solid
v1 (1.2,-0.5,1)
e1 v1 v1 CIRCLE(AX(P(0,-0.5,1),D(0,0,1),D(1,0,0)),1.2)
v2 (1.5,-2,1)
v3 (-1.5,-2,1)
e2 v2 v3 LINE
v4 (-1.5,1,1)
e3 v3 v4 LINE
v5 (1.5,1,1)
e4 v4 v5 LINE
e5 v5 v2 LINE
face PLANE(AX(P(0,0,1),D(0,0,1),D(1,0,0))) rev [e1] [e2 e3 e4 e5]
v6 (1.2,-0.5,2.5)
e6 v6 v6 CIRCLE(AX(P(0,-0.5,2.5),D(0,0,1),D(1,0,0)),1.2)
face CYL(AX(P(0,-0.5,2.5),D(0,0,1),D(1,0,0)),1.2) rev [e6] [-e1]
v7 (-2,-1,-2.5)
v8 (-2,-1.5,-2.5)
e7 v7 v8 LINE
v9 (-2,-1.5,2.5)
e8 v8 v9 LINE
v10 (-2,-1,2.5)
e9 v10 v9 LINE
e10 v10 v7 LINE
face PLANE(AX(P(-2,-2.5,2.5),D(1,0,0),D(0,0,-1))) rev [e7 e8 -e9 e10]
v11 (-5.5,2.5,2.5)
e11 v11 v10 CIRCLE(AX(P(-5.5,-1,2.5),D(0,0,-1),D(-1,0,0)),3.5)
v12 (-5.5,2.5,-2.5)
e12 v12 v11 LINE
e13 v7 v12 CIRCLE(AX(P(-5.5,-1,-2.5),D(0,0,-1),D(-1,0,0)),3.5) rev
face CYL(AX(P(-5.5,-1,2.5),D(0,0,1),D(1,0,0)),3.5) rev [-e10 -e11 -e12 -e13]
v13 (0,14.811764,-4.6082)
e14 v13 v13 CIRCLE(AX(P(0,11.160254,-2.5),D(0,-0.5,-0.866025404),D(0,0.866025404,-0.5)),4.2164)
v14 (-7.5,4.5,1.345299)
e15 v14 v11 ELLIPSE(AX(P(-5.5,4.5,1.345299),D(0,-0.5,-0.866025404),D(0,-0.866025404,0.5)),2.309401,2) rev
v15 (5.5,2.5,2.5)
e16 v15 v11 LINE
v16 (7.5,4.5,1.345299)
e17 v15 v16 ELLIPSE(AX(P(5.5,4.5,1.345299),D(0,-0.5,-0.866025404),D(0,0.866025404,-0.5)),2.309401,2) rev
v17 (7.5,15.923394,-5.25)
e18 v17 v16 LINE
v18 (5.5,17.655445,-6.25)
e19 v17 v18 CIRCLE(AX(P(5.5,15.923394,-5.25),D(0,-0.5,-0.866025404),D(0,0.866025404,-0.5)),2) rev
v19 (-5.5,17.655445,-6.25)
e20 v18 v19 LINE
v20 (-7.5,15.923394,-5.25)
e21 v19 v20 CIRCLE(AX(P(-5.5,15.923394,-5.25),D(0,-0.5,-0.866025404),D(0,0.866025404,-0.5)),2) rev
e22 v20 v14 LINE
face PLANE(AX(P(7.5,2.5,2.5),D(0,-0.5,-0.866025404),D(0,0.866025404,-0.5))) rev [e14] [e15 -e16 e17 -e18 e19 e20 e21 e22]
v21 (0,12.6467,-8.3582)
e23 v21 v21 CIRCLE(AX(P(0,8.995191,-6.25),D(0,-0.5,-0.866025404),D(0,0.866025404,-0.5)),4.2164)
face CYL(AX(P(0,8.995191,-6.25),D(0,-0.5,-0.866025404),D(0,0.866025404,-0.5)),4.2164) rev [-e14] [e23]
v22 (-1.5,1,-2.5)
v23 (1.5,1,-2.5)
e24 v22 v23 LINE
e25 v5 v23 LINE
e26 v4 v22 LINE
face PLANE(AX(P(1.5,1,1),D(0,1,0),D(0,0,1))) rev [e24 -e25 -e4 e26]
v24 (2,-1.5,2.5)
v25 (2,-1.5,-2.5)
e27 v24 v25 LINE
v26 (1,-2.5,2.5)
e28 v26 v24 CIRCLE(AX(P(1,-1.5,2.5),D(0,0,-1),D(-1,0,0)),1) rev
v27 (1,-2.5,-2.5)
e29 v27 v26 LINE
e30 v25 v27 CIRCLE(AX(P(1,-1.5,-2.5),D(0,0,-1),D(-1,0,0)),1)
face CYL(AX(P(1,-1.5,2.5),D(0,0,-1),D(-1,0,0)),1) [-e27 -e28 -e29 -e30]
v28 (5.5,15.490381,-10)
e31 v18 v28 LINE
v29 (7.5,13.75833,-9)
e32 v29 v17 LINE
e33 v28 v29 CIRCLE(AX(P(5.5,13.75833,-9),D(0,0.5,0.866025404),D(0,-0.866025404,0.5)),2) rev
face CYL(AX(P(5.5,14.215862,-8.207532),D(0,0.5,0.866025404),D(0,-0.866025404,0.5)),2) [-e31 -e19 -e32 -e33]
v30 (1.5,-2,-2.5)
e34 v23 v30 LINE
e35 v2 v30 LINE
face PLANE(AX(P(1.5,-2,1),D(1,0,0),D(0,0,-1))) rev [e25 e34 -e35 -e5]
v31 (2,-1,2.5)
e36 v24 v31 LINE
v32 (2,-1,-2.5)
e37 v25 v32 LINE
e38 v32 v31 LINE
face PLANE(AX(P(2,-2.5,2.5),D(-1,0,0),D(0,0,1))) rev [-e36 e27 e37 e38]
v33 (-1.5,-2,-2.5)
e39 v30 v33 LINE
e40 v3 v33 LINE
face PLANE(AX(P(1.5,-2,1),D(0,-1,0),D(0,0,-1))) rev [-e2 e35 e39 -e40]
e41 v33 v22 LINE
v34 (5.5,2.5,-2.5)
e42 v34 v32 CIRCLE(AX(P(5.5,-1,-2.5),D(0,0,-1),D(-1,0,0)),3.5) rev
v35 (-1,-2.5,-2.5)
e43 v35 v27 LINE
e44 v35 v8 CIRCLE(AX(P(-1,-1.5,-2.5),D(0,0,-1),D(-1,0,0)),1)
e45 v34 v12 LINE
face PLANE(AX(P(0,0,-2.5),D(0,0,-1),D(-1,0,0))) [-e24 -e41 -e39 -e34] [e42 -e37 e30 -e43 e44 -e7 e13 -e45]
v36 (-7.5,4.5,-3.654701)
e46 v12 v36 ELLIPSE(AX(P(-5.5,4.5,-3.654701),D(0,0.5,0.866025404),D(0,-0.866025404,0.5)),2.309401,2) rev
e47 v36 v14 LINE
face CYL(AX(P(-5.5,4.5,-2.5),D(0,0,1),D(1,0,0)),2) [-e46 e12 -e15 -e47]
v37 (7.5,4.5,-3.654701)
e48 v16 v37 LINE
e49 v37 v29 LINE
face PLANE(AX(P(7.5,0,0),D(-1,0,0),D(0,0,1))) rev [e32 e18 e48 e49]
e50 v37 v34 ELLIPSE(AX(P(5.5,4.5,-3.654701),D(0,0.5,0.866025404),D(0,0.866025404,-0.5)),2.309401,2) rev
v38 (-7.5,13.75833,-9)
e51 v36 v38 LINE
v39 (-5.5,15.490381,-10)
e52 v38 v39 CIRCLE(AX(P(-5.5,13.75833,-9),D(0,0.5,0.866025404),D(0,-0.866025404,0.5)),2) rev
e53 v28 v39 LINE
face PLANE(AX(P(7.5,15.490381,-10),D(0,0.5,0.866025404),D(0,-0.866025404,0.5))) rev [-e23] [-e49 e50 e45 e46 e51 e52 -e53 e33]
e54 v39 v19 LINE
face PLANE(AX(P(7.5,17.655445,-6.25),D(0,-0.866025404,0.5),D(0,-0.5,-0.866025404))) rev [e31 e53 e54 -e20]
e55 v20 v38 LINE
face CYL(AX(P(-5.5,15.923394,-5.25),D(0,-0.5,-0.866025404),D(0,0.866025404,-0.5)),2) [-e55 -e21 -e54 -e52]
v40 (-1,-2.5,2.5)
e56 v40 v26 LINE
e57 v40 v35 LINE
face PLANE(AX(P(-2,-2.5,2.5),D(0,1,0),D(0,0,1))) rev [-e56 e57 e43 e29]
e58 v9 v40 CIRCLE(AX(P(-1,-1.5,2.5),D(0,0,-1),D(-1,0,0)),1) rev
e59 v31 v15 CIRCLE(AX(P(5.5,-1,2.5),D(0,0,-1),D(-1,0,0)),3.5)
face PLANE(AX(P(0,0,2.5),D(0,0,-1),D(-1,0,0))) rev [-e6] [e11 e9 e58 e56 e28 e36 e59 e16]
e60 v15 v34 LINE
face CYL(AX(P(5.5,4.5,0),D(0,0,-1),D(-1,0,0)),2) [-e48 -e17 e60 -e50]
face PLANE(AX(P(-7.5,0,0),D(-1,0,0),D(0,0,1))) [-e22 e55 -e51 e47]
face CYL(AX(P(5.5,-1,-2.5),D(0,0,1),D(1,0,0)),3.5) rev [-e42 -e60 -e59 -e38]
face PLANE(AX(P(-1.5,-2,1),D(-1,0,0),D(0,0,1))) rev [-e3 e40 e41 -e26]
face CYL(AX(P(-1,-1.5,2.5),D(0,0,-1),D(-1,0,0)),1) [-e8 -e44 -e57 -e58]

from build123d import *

# Parameters (mm, degrees)
SKETCH1_W                = 4
SKETCH1_H                = 5
BOSS_EXTRUDE1_DEPTH      = 2.5
SKETCH2_W                = 3
SKETCH2_H                = 3
CUT_EXTRUDE1_DEPTH       = 3.5
BOSS_EXTRUDE2_DEPTH      = 7.5
F_5_16_CLEARANCE_HOLE1_D = 8.4328
M2_CLEARANCE_HOLE1_D     = 2.4
FILLET1_R                = 3.5
FILLET2_R                = 2
FILLET3_R                = 1


with BuildPart() as part:
    # Sketch1 → Boss-Extrude1 (new, symmetric)
    with BuildSketch(Plane.XY):
        Rectangle(SKETCH1_W, SKETCH1_H)
    extrude(amount=BOSS_EXTRUDE1_DEPTH, both=True)

    # Sketch2 → Cut-Extrude1 (cut)
    with BuildSketch(Plane(origin=(0, 0, -2.5), x_dir=(-1, 0, 0), z_dir=(0, 0, -1))):
        with Locations((0, -0.5)):
            Rectangle(SKETCH2_W, SKETCH2_H)
    extrude(amount=-CUT_EXTRUDE1_DEPTH, mode=Mode.SUBTRACT)

    # Sketch3 → Boss-Extrude2 (add, symmetric)
    with BuildSketch(Plane(origin=(0, 0, 0), x_dir=(0, 0, -1), z_dir=(1, 0, 0))):
        Polygon((-2.5, 2.5), (6.25, 17.655444566), (10, 15.490381057), (2.5, 2.5), align=None)
    extrude(amount=BOSS_EXTRUDE2_DEPTH, both=True)

    # 5/16 Clearance Hole1 (through all)
    with Locations(Plane(origin=(0, -0.457531755, -0.792468245), x_dir=(-1, 0, 0), z_dir=(0, -0.5000000000000038, -0.8660254037844366))):
        with Locations((0, 10.915063509)):
            Hole(F_5_16_CLEARANCE_HOLE1_D / 2)

    # M2 Clearance Hole1 (through all)
    with Locations(Plane.XY.offset(2.5)):
        with Locations((0, -0.5)):
            Hole(M2_CLEARANCE_HOLE1_D / 2)

    # Fillet1
    fillet1_edges = [part.edges().sort_by_distance(p)[0] for p in [
        (-2, 2.5, 0),
        (2, 2.5, 0),
    ]]
    fillet(fillet1_edges, radius=FILLET1_R)

    # Fillet2
    fillet2_edges = [part.edges().sort_by_distance(p)[0] for p in [
        (-7.5, 16.572912811, -8.125),
        (7.5, 16.572912811, -8.125),
        (7.5, 2.5, 0),
        (-7.5, 2.5, 0),
    ]]
    fillet(fillet2_edges, radius=FILLET2_R - 0.0001)  # a hair under: the kernel refuses the full size

    # Fillet3
    fillet3_edges = [part.edges().sort_by_distance(p)[0] for p in [
        (2, -2.5, 0),
        (-2, -2.5, 0),
    ]]
    fillet(fillet3_edges, radius=FILLET3_R)


solid = part.part
